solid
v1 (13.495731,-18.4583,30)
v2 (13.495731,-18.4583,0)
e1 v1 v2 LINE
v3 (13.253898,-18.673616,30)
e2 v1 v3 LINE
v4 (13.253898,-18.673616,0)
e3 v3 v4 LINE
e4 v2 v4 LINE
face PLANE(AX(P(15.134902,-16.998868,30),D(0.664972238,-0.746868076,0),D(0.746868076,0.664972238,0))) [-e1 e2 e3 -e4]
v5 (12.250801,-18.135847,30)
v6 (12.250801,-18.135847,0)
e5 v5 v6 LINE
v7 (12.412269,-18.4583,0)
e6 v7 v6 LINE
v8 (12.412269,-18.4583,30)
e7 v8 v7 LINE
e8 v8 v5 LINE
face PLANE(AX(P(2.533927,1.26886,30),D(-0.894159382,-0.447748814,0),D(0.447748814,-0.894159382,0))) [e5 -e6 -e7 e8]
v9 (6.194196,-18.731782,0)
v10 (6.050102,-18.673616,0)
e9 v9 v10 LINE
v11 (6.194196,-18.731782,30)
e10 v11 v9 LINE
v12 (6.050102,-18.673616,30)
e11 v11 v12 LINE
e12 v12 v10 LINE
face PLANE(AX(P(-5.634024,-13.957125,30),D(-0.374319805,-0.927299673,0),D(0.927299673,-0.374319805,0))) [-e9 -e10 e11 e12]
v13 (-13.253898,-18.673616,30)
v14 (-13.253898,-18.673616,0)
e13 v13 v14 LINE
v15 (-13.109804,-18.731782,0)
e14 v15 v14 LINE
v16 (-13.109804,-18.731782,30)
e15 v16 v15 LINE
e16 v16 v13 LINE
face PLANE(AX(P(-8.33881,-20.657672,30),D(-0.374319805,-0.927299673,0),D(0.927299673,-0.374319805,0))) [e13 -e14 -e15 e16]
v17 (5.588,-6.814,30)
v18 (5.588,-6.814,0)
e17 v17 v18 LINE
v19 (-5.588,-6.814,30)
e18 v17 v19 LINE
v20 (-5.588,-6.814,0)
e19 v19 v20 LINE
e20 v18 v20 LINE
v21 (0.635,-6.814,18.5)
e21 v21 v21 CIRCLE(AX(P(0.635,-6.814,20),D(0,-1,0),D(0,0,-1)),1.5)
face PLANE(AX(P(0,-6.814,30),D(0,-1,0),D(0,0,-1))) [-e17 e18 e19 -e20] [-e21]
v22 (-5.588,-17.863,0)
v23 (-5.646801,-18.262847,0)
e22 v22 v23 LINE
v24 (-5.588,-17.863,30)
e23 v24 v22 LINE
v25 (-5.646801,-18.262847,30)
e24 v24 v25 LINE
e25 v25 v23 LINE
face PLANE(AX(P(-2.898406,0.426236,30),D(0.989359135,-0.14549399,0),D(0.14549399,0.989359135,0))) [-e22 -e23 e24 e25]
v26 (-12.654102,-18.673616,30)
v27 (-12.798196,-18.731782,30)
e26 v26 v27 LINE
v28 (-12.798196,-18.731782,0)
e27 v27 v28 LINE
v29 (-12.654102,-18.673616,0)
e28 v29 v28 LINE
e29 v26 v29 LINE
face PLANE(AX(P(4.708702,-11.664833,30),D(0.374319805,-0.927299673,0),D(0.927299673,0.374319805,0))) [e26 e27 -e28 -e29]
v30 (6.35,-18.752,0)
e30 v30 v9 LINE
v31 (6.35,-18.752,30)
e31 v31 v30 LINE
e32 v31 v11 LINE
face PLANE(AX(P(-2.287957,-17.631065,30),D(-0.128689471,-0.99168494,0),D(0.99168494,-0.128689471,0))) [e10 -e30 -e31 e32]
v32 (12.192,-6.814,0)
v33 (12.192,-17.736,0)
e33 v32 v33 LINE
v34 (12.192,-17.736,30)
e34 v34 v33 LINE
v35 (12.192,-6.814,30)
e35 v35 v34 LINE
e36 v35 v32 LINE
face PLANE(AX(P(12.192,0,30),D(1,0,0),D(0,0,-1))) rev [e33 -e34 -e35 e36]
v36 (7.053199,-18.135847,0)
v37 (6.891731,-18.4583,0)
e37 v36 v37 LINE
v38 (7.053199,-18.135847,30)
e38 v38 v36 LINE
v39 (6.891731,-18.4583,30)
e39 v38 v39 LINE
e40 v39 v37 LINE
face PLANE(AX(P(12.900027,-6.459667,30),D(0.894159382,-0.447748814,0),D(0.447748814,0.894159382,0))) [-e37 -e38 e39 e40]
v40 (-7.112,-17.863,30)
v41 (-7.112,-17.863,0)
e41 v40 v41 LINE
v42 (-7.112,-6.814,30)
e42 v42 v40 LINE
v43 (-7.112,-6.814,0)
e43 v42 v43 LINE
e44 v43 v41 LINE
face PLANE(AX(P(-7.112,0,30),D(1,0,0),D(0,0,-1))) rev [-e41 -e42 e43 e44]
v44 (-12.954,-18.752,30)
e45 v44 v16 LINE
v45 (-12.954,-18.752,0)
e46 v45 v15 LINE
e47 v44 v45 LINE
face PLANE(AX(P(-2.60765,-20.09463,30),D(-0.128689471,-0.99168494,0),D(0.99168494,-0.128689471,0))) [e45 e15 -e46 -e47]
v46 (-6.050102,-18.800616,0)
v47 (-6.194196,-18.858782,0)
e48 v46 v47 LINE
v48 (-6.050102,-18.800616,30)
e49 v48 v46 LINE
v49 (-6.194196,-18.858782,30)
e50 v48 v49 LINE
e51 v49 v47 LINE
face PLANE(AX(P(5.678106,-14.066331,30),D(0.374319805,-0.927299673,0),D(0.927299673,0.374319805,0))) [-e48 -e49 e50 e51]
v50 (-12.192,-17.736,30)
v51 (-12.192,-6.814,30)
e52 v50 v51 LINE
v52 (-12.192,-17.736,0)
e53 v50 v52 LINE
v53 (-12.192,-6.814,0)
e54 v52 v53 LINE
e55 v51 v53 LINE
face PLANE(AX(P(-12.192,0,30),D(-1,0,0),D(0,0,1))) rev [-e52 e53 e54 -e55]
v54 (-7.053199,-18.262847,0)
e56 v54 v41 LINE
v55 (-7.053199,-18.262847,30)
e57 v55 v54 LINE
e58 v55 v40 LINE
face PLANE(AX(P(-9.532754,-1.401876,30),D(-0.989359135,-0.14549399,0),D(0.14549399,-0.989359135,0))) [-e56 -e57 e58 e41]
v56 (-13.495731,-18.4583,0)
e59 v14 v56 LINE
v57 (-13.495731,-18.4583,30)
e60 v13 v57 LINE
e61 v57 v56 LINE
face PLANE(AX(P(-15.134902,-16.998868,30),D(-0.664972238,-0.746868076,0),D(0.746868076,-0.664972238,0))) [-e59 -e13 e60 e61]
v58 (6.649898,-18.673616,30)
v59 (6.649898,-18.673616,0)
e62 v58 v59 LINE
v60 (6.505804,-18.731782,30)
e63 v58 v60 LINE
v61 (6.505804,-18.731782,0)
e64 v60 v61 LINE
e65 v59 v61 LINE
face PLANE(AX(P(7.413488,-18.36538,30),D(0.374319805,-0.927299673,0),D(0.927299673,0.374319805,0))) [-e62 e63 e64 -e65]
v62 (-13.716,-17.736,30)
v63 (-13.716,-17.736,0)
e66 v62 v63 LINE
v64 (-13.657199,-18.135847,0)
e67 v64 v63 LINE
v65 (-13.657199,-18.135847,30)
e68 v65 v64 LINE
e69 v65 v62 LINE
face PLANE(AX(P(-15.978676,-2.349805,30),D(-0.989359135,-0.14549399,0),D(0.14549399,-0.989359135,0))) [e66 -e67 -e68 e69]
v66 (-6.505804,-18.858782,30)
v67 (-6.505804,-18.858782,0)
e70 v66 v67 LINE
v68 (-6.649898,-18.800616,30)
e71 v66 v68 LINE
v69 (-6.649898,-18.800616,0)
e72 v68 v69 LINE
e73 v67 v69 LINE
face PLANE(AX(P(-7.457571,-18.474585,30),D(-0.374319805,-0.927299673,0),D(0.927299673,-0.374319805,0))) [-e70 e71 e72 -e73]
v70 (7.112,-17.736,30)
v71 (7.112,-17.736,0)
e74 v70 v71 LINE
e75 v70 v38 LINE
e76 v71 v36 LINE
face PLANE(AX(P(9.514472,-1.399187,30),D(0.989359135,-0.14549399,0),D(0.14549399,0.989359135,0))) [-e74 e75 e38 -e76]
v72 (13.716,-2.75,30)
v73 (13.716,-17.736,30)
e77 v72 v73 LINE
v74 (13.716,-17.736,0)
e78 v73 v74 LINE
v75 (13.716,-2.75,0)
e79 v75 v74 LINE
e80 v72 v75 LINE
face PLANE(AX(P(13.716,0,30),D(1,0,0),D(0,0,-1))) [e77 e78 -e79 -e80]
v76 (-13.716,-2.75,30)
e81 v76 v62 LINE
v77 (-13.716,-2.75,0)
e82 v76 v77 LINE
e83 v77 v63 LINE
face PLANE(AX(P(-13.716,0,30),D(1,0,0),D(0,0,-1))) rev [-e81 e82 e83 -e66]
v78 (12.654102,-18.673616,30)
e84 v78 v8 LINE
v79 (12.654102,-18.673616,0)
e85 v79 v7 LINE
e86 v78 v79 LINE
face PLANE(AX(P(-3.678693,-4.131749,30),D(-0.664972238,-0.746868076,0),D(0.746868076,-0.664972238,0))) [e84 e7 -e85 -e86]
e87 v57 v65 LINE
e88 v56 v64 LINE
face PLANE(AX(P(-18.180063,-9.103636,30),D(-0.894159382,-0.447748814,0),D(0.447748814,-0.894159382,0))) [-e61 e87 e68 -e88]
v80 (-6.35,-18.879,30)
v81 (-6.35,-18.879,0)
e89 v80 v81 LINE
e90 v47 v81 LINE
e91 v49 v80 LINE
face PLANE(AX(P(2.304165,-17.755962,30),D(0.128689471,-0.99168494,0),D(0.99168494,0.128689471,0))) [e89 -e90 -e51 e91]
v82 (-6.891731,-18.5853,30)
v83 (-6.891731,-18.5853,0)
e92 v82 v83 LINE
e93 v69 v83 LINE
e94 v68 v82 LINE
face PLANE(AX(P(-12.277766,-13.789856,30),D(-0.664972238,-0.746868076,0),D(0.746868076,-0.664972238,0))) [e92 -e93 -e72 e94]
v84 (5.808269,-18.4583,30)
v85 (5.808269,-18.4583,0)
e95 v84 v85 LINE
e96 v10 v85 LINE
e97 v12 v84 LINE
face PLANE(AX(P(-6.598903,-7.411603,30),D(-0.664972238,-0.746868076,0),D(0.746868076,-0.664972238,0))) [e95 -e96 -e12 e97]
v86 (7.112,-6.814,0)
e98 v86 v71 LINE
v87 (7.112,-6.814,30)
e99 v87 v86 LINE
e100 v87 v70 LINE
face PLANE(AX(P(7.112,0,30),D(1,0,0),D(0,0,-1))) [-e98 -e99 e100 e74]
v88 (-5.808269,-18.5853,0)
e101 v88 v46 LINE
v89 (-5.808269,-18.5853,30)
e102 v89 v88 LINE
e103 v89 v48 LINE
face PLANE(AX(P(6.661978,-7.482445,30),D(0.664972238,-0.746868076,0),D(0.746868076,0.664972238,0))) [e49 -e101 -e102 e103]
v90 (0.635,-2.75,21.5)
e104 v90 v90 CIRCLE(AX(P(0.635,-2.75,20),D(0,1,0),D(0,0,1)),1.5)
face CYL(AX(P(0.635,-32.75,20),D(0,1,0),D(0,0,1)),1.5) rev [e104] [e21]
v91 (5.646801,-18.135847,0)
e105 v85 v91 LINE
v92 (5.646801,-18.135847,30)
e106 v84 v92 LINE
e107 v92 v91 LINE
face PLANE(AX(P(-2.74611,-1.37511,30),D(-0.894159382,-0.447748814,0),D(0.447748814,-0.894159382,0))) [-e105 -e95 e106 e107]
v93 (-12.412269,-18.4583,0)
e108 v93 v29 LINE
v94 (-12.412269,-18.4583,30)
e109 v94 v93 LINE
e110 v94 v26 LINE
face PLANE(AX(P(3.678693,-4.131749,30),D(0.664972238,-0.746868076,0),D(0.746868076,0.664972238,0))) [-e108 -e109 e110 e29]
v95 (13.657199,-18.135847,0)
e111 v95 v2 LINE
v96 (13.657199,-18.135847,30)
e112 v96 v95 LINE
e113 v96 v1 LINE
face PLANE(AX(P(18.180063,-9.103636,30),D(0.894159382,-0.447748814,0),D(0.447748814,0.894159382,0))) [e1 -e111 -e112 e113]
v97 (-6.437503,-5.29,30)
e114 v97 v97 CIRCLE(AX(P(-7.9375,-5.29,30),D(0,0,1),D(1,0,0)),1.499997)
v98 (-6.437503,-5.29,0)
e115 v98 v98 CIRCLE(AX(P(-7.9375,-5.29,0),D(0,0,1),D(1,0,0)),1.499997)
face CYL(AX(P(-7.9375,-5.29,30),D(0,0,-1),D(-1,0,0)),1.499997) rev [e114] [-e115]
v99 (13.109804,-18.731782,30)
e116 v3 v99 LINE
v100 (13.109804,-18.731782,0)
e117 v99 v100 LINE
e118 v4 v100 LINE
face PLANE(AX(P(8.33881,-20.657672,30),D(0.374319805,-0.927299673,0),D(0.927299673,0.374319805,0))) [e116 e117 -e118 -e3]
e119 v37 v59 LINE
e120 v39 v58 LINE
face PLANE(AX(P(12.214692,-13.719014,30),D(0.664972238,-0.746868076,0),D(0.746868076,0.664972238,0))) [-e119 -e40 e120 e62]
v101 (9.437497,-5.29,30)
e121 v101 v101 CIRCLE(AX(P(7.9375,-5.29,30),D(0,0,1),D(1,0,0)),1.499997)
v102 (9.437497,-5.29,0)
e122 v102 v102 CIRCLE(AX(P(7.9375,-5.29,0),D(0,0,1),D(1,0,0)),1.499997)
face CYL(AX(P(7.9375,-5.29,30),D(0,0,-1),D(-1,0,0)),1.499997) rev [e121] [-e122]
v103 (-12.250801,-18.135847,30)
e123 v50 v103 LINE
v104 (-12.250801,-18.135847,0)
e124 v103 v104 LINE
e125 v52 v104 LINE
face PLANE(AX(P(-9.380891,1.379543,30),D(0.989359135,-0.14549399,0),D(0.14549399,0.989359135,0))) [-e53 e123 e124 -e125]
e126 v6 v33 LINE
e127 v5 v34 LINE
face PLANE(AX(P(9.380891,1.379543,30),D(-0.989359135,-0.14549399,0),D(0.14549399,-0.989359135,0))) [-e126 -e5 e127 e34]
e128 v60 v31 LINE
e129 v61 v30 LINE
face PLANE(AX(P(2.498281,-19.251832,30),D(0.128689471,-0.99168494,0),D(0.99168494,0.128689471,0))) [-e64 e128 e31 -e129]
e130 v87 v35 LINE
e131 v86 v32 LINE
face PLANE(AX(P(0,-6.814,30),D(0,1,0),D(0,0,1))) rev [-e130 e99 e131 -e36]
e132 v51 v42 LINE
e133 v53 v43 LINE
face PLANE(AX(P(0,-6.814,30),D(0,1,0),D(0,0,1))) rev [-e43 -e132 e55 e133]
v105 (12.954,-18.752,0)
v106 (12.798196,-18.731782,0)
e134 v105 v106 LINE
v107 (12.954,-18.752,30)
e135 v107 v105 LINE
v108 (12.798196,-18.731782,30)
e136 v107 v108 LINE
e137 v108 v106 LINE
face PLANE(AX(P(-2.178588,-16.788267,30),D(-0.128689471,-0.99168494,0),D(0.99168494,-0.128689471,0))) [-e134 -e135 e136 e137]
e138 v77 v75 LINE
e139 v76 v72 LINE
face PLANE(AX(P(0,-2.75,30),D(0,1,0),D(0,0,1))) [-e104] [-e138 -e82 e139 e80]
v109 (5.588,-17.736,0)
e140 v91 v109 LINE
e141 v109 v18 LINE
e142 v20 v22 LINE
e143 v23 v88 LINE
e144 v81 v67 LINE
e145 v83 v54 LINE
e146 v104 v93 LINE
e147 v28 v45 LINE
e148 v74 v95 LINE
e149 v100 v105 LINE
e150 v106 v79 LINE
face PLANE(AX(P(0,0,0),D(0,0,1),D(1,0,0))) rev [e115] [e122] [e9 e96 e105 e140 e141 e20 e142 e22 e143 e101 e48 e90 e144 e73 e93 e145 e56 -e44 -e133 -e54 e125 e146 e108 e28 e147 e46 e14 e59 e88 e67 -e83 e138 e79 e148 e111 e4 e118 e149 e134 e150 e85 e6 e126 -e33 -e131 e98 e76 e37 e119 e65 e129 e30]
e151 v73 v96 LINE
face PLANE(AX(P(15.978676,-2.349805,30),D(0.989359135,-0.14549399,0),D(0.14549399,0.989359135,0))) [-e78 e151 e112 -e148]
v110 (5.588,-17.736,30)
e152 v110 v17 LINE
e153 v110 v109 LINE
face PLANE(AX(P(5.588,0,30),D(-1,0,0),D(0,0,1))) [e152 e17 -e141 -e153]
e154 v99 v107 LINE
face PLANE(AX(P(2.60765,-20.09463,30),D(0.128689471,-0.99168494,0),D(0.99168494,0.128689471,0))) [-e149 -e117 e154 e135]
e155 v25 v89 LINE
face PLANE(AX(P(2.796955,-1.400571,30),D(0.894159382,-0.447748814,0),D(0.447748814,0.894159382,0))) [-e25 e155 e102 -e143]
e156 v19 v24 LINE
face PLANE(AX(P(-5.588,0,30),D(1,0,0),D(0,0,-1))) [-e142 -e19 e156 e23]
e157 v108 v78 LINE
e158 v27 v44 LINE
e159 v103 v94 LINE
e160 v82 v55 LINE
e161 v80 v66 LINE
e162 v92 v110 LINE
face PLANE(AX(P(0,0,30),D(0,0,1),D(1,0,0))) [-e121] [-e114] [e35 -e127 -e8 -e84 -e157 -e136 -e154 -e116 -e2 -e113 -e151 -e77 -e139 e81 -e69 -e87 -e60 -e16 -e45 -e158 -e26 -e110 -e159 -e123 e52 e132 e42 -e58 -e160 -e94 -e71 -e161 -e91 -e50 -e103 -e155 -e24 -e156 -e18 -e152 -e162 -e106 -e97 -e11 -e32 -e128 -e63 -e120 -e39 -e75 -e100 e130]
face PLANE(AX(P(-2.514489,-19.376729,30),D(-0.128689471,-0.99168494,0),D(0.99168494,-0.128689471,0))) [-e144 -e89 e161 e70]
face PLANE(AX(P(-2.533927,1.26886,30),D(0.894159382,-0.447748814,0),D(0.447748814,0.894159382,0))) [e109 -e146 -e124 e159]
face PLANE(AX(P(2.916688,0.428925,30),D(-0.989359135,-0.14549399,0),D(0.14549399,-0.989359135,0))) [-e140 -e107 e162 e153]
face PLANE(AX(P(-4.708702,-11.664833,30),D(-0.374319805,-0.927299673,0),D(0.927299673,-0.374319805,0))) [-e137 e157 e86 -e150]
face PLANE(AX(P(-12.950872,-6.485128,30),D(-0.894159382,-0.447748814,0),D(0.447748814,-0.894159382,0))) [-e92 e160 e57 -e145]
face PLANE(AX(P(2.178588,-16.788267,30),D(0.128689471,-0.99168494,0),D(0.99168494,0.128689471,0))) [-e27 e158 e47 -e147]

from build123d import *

# Parameters (mm, degrees)
RESSALTO_EXTRUS_O1_OUTLINE_R = 1.499997
RESSALTO_EXTRUS_O1_DEPTH     = 30
ESBO_O2_R                    = 1.5
CORTE_EXTRUS_O1_DEPTH        = 30


# Read off the part's stored shape, not the designer's step: Ressalto-extrusão1
with BuildPart() as part:
    # Ressalto-extrusão1 outline → Ressalto-extrusão1 (new body)
    with BuildSketch(Plane.XY):
        Polygon((-5.588, -17.863), (-5.588, -6.814), (5.588, -6.814), (5.588, -17.736), (5.646801, -18.1358468), (5.8082688, -18.4582998), (6.0501022, -18.6736156), (6.1941964, -18.7317816), (6.35, -18.752), (6.5058036, -18.7317816), (6.6498978, -18.6736156), (6.8917312, -18.4582998), (7.053199, -18.1358468), (7.112, -17.736), (7.112, -6.814), (12.192, -6.814), (12.192, -17.736), (12.250801, -18.1358468), (12.4122688, -18.4582998), (12.6541022, -18.6736156), (12.7981964, -18.7317816), (12.954, -18.752), (13.1098036, -18.7317816), (13.2538978, -18.6736156), (13.4957312, -18.4582998), (13.657199, -18.1358468), (13.716, -17.736), (13.716, -2.75), (-13.716, -2.75), (-13.716, -17.736), (-13.657199, -18.1358468), (-13.4957312, -18.4582998), (-13.2538978, -18.6736156), (-13.1098036, -18.7317816), (-12.954, -18.752), (-12.7981964, -18.7317816), (-12.6541022, -18.6736156), (-12.4122688, -18.4582998), (-12.250801, -18.1358468), (-12.192, -17.736), (-12.192, -6.814), (-7.112, -6.814), (-7.112, -17.863), (-7.053199, -18.2628468), (-6.8917312, -18.5852998), (-6.6498978, -18.8006156), (-6.5058036, -18.8587816), (-6.35, -18.879), (-6.1941964, -18.8587816), (-6.0501022, -18.8006156), (-5.8082688, -18.5852998), (-5.646801, -18.2628468), align=None)
        with Locations((-7.9375, -5.29)):
            Circle(RESSALTO_EXTRUS_O1_OUTLINE_R, mode=Mode.SUBTRACT)
        with Locations((7.9375, -5.29)):
            Circle(RESSALTO_EXTRUS_O1_OUTLINE_R, mode=Mode.SUBTRACT)
    extrude(amount=RESSALTO_EXTRUS_O1_DEPTH)

    # Esboço2 → Corte-extrusão1 (cut)
    with BuildSketch(Plane(origin=(0, -2.75, 0), x_dir=(1, 0, 0), z_dir=(0, 1, 0))):
        with Locations(Location((0.635, -20, 0), (0, 0, 270))):
            Circle(ESBO_O2_R)
    extrude(amount=-CORTE_EXTRUS_O1_DEPTH, mode=Mode.SUBTRACT)


solid = part.part
